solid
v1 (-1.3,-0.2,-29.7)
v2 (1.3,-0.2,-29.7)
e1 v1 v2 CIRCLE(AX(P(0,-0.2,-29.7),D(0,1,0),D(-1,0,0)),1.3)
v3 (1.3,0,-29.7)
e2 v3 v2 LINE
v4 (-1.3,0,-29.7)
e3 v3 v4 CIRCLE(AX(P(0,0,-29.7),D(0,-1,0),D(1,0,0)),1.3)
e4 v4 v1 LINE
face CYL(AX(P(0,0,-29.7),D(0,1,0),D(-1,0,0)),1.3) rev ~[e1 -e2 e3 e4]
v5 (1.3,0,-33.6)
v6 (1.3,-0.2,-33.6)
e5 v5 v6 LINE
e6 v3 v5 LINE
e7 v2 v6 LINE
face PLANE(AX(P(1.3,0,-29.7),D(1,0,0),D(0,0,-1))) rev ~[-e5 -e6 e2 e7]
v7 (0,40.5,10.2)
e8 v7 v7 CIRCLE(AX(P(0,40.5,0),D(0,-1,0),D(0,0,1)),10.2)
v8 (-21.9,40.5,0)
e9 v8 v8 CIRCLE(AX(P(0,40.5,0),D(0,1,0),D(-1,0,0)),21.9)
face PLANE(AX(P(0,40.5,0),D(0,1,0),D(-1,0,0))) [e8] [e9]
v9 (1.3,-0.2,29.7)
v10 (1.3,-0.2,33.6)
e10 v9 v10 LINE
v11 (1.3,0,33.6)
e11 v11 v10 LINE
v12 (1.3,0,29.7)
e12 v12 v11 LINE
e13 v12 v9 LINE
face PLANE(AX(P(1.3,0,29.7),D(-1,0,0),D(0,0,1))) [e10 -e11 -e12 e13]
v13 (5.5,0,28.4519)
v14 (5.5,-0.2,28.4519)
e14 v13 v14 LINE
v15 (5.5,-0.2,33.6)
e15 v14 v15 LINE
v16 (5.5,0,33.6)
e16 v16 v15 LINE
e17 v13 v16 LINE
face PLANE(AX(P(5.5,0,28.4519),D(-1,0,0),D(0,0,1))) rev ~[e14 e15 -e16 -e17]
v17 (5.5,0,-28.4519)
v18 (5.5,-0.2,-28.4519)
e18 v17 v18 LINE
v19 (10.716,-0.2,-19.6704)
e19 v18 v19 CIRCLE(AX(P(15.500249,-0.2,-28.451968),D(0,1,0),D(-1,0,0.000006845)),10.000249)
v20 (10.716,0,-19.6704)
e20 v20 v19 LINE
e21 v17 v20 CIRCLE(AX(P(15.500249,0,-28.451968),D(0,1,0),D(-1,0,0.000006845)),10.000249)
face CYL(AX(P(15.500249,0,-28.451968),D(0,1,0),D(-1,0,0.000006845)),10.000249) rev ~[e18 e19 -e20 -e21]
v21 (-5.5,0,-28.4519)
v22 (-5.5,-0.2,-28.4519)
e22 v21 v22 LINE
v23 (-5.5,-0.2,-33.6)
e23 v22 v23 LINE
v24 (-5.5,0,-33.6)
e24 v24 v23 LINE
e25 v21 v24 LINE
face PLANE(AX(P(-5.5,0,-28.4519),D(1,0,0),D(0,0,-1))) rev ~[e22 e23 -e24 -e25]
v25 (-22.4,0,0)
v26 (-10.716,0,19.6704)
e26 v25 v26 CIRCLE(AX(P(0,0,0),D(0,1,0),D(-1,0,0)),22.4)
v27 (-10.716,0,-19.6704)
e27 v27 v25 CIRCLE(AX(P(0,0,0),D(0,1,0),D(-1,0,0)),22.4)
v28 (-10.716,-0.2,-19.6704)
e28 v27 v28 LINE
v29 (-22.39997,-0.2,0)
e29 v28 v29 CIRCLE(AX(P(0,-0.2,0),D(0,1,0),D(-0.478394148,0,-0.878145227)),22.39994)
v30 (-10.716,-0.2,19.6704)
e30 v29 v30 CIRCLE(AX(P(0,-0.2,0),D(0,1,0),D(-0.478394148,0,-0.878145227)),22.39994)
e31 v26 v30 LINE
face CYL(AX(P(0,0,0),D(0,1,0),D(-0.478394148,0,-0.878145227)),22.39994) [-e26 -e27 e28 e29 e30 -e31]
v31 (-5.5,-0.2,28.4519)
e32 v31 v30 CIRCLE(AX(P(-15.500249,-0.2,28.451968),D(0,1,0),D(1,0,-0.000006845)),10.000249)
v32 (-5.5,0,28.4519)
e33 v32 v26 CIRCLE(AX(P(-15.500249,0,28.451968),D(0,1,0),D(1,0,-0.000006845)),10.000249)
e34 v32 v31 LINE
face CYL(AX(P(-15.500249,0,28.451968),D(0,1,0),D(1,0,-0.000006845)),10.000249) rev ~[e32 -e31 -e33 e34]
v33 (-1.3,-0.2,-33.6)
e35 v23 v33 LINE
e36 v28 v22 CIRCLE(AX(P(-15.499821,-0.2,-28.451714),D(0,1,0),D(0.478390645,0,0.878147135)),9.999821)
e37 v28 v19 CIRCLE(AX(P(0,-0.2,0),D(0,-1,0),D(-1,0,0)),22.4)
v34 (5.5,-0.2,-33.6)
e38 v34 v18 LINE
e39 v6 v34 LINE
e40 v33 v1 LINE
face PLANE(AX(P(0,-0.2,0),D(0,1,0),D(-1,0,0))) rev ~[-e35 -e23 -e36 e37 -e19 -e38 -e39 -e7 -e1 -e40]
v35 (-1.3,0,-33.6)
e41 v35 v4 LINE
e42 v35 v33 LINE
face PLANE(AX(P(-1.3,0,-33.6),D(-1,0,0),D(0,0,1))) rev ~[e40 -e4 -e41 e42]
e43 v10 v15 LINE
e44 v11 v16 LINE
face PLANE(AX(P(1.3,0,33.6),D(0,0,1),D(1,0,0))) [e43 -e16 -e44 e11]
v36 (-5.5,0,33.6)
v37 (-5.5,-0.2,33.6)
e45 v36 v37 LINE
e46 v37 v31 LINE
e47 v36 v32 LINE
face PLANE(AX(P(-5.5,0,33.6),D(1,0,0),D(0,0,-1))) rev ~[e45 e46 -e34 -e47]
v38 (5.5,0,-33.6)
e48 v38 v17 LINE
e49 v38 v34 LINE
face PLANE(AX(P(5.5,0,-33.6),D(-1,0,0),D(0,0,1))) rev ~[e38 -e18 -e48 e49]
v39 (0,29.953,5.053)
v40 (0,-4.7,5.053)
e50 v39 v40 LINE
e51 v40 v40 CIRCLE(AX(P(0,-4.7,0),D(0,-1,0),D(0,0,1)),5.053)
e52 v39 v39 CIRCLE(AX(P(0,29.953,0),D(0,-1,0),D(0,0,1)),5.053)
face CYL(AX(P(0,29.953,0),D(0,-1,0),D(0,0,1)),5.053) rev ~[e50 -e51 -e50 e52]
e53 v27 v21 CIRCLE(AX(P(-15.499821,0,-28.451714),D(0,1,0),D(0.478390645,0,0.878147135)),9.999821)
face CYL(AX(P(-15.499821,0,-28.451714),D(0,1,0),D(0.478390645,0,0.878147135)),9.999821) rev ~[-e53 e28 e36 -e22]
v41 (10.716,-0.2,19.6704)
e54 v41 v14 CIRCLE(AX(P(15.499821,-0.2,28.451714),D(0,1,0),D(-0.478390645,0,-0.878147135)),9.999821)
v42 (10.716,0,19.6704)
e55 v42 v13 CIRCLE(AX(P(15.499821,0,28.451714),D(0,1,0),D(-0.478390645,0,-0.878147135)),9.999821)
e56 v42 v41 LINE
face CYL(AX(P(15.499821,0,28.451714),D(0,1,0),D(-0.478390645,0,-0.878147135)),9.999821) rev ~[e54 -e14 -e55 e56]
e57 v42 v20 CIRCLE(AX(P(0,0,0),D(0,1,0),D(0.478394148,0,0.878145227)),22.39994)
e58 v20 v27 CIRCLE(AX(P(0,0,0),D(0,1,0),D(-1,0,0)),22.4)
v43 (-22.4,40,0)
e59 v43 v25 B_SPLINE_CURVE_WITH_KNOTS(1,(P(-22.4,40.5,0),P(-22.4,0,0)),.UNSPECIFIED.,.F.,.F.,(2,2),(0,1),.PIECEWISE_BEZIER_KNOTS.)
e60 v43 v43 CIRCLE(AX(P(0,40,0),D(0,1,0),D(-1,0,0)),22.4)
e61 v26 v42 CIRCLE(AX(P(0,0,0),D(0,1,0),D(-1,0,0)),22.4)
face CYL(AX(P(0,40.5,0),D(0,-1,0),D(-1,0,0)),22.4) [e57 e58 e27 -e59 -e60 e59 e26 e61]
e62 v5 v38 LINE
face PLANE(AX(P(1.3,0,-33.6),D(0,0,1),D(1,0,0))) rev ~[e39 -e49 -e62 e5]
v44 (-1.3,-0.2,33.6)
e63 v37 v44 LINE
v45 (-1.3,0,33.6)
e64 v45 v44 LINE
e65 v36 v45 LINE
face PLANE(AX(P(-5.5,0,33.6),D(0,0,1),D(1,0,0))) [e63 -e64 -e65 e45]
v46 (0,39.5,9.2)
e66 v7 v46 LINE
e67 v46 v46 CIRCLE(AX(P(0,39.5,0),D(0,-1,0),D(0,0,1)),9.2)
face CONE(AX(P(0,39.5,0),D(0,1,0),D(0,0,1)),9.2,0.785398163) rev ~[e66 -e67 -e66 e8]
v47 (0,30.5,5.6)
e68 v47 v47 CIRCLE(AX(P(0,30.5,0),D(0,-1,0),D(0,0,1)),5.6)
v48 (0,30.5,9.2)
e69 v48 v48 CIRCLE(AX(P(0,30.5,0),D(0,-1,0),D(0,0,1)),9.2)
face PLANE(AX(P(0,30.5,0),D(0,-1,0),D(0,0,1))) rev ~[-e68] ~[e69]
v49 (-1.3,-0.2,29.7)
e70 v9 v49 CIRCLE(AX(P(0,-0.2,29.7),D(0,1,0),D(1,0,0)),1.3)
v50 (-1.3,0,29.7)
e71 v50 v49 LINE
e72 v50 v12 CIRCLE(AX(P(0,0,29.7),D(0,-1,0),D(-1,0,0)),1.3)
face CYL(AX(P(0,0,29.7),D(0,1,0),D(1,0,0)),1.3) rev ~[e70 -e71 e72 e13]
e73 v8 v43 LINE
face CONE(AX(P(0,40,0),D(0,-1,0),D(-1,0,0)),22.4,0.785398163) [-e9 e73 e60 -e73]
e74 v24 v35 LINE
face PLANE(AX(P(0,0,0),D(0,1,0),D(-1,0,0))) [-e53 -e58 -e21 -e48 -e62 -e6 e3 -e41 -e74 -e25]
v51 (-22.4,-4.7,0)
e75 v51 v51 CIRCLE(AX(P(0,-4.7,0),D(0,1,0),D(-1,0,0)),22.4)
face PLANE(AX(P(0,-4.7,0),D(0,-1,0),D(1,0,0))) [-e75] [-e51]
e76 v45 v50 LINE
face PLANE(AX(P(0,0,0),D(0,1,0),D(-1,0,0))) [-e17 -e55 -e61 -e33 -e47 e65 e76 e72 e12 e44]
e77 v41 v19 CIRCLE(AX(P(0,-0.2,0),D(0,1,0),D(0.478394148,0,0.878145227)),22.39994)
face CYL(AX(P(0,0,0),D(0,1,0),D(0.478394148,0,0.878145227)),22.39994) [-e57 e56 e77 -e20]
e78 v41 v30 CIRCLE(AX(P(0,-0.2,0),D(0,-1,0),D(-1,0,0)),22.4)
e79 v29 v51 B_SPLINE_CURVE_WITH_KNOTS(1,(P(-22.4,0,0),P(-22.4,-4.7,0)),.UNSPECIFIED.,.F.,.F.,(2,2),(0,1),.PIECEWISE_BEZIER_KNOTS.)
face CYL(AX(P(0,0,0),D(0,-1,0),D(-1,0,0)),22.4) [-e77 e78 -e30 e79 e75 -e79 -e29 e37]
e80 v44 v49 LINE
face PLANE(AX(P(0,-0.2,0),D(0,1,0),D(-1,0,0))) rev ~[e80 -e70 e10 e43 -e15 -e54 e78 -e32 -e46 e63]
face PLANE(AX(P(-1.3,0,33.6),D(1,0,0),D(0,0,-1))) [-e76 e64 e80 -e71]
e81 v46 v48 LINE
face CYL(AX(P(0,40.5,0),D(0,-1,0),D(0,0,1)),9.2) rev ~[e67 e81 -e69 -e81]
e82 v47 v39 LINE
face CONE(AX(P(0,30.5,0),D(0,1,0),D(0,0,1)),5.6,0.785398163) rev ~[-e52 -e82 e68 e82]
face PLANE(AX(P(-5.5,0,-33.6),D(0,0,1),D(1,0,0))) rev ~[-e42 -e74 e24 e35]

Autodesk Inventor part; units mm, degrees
sketch "Sketch1" plane through (0, 0, 0) normal (0, 1, 0) x (-1, 0, 0)
  circle A0 centre (0, 0) radius 22.4
  dimension "d0" = 44.8
ref_plane "Work Plane1" through (0, 40.5, 0) normal (0, 1, 0) x (-1, 0, 0)
sketch "Sketch2" plane through (0, 40.5, 0) normal (0, 1, 0) x (-1, 0, 0)
  circle A0 centre (0, 0) radius 22.4 projected
ref_plane "Work Plane3" through (0, -53, 0) normal (0, 1, 0) x (-1, 0, 0)
ref_plane "Work Plane2" through (0, -41, 0) normal (0, 1, 0) x (-1, 0, 0)
sketch "Sketch3" plane through (0, -41, 0) normal (0, 1, 0) x (-1, 0, 0)
  circle A0 centre (0, 0) radius 33.8
  dimension "d4" = 67.6
sketch "Sketch4" plane through (0, -53, 0) normal (0, 1, 0) x (-1, 0, 0)
  circle A0 centre (0, 0) radius 33.8 projected
loft "Loft1" add profiles "Sketch2", "Sketch1"
loft "Loft3" [suppressed]
sketch "Sketch5" plane through (0, 0, 0) normal (0, 1, 0) x (-1, 0, 0)
  line L0 (-5.5, 33.6) -> (5.5, -33.6) construction
  line L1 (3.6185, 22.1058) -> (-5.5, -33.6) construction
  line L2 (5.5, 33.6) -> (5.5, 28.4519)
  line L3 (5.5, -28.4519) -> (5.5, -33.6)
  line L4 (-5.5, -33.6) -> (-5.5, -28.4519)
  line L5 (-5.5, 28.4519) -> (-5.5, 33.6)
  arc A0 (-10.716, 19.6704) -> (-10.716, -19.6704) centre (0, 0) ccw
  arc A1 (10.716, -19.6704) -> (10.716, 19.6704) centre (0, 0) ccw
  arc A2 (5.5, 28.4519) -> (10.716, 19.6704) centre (15.5, 28.4519) ccw
  arc A3 (-10.716, 19.6704) -> (-5.5, 28.4519) centre (-15.5, 28.4519) ccw
  arc A4 (10.716, -19.6704) -> (5.5, -28.4519) centre (15.5, -28.4519) ccw
  arc A5 (-5.5, -28.4519) -> (-10.716, -19.6704) centre (-15.5, -28.4519) ccw
  circle A6 centre (0, 0) radius 22.4 construction
  line L6 (0, -22.4) -> (0, -33.6) construction
  line L7 (1.3, -33.6) -> (1.3, -29.7)
  line L8 (0, -28.4) -> (0, -28.4)
  line L9 (-1.3, -29.7) -> (-1.3, -33.6)
  arc A7 (1.3, -29.7) -> (0, -28.4) centre (0, -29.7) ccw
  arc A8 (0, -28.4) -> (-1.3, -29.7) centre (0, -29.7) ccw
  line L10 (5.5, -33.6) -> (1.3, -33.6)
  line L11 (-1.3, -33.6) -> (-5.5, -33.6)
  circle A9 centre (0, 0) radius 33.8 construction
  line L12 (33.8, 0) -> (-33.8, 0) construction
  line L13 (0, 22.4) -> (0, 33.6) construction
  line L14 (1.3, 33.6) -> (1.3, 29.7)
  line L15 (-1.3, 29.7) -> (-1.3, 33.6)
  arc A10 (0, 28.4) -> (1.3, 29.7) centre (0, 29.7) ccw
  arc A11 (-1.3, 29.7) -> (0, 28.4) centre (0, 29.7) ccw
  line L16 (5.5, 33.6) -> (1.3, 33.6)
  line L17 (-1.3, 33.6) -> (-5.5, 33.6)
  circle A12 centre (0, 0) radius 33.8 construction
  point P0 (5.5, 21.7143)
  point P1 (5.5, -21.7143)
  point P2 (-5.5, 21.7143)
  point P3 (-5.5, -21.7143)
  point P4 (1.3, -28.4)
  point P5 (-1.3, -28.4)
  point P6 (1.3, 28.4)
  point P7 (-1.3, 28.4)
  point P8 (0, 28.4)
  dimension "d17" = 11
  dimension "d18" = 67.2
  dimension "d19" = 10
  dimension "d20" = 2.6
  dimension "d21" = 5.2
  dimension "d22" = 1.3
extrude "Extrusion1" add sketch "Sketch5" against normal blind 0.2
ref_plane "Work Plane4" through (0, -4.7, 0) normal (0, 1, 0) x (-1, 0, 0)
sketch "Sketch6" plane through (0, -4.7, 0) normal (0, 1, 0) x (-1, 0, 0)
  circle A0 centre (0, 0) radius 22.4 projected
ref_plane "Work Plane5" through (0, -53, 0) normal (0, 1, 0) x (-1, 0, 0)
sketch "Sketch7" plane through (0, -53, 0) normal (0, 1, 0) x (-1, 0, 0)
  circle A0 centre (0, 0) radius 33.8 projected
loft "Loft4" add profiles "Sketch7", "Sketch3"
loft "Loft5" add profiles "Sketch6" section 1 edges at (33.8, -41, 0)
sketch "Sketch8" plane through (0, 0, 0) normal (0, 1, 0) x (-1, 0, 0)
  circle A0 centre (0, 0) radius 22.4 projected
loft "Loft6" add profiles "Sketch8" section 2 edges at (22.4, -4.7, 0)
sketch "Sketch9" plane through (0, 40.5, 0) normal (0, 1, 0) x (1, 0, 0)
  point P0 (0, 0)
  point P1 (0, 0)
hole "Hole1" at (0, 40.5, 0) direction (0, -1, 0) diameter 18.4 depth 10
chamfer "Chamfer1" distance 1 angle 45 1 edges at (0, 40.5, -9.2)
chamfer "Chamfer2" distance 0.5 angle 45 1 edges at (22.4, 40.5, 0)
sketch "Sketch10" plane through (0, -53, 0) normal (0, -1, 0) x (1, 0, 0)
  point P0 (0, 0)
  point P1 (0, 0)
hole "Hole2" at (0, -53, 0) direction (0, 1, 0) diameter 13.5 depth 10
sketch "Sketch11" plane through (0, -53, 0) normal (0, -1, 0) x (1, 0, 0)
  line L0 (56, 85) -> (-56, 85)
  line L1 (-56, 85) -> (-56, -85)
  line L2 (-56, -85) -> (56, -85)
  line L3 (56, -85) -> (56, 85)
  line L4 (56, 85) -> (-56, -85) construction
  line L5 (-56, 85) -> (56, -85) construction
  point P0 (0, 0)
extrude "Extrusion2" cut sketch "Sketch11" against normal blind 48.3
sketch "Sketch12" plane through (0, 30.5, 0) normal (0, 1, 0) x (1, 0, 0)
  circle A0 centre (0, 0) radius 9.2
hole "Hole3" at (0, 30.5, 0) direction (0, -1, 0) diameter 10.106 end through all countersink diameter 11.2 countersink angle 90 thread size "M12x1.75" class "6H" standard "ISO Metric profile"
properties part number "shaker cut"
